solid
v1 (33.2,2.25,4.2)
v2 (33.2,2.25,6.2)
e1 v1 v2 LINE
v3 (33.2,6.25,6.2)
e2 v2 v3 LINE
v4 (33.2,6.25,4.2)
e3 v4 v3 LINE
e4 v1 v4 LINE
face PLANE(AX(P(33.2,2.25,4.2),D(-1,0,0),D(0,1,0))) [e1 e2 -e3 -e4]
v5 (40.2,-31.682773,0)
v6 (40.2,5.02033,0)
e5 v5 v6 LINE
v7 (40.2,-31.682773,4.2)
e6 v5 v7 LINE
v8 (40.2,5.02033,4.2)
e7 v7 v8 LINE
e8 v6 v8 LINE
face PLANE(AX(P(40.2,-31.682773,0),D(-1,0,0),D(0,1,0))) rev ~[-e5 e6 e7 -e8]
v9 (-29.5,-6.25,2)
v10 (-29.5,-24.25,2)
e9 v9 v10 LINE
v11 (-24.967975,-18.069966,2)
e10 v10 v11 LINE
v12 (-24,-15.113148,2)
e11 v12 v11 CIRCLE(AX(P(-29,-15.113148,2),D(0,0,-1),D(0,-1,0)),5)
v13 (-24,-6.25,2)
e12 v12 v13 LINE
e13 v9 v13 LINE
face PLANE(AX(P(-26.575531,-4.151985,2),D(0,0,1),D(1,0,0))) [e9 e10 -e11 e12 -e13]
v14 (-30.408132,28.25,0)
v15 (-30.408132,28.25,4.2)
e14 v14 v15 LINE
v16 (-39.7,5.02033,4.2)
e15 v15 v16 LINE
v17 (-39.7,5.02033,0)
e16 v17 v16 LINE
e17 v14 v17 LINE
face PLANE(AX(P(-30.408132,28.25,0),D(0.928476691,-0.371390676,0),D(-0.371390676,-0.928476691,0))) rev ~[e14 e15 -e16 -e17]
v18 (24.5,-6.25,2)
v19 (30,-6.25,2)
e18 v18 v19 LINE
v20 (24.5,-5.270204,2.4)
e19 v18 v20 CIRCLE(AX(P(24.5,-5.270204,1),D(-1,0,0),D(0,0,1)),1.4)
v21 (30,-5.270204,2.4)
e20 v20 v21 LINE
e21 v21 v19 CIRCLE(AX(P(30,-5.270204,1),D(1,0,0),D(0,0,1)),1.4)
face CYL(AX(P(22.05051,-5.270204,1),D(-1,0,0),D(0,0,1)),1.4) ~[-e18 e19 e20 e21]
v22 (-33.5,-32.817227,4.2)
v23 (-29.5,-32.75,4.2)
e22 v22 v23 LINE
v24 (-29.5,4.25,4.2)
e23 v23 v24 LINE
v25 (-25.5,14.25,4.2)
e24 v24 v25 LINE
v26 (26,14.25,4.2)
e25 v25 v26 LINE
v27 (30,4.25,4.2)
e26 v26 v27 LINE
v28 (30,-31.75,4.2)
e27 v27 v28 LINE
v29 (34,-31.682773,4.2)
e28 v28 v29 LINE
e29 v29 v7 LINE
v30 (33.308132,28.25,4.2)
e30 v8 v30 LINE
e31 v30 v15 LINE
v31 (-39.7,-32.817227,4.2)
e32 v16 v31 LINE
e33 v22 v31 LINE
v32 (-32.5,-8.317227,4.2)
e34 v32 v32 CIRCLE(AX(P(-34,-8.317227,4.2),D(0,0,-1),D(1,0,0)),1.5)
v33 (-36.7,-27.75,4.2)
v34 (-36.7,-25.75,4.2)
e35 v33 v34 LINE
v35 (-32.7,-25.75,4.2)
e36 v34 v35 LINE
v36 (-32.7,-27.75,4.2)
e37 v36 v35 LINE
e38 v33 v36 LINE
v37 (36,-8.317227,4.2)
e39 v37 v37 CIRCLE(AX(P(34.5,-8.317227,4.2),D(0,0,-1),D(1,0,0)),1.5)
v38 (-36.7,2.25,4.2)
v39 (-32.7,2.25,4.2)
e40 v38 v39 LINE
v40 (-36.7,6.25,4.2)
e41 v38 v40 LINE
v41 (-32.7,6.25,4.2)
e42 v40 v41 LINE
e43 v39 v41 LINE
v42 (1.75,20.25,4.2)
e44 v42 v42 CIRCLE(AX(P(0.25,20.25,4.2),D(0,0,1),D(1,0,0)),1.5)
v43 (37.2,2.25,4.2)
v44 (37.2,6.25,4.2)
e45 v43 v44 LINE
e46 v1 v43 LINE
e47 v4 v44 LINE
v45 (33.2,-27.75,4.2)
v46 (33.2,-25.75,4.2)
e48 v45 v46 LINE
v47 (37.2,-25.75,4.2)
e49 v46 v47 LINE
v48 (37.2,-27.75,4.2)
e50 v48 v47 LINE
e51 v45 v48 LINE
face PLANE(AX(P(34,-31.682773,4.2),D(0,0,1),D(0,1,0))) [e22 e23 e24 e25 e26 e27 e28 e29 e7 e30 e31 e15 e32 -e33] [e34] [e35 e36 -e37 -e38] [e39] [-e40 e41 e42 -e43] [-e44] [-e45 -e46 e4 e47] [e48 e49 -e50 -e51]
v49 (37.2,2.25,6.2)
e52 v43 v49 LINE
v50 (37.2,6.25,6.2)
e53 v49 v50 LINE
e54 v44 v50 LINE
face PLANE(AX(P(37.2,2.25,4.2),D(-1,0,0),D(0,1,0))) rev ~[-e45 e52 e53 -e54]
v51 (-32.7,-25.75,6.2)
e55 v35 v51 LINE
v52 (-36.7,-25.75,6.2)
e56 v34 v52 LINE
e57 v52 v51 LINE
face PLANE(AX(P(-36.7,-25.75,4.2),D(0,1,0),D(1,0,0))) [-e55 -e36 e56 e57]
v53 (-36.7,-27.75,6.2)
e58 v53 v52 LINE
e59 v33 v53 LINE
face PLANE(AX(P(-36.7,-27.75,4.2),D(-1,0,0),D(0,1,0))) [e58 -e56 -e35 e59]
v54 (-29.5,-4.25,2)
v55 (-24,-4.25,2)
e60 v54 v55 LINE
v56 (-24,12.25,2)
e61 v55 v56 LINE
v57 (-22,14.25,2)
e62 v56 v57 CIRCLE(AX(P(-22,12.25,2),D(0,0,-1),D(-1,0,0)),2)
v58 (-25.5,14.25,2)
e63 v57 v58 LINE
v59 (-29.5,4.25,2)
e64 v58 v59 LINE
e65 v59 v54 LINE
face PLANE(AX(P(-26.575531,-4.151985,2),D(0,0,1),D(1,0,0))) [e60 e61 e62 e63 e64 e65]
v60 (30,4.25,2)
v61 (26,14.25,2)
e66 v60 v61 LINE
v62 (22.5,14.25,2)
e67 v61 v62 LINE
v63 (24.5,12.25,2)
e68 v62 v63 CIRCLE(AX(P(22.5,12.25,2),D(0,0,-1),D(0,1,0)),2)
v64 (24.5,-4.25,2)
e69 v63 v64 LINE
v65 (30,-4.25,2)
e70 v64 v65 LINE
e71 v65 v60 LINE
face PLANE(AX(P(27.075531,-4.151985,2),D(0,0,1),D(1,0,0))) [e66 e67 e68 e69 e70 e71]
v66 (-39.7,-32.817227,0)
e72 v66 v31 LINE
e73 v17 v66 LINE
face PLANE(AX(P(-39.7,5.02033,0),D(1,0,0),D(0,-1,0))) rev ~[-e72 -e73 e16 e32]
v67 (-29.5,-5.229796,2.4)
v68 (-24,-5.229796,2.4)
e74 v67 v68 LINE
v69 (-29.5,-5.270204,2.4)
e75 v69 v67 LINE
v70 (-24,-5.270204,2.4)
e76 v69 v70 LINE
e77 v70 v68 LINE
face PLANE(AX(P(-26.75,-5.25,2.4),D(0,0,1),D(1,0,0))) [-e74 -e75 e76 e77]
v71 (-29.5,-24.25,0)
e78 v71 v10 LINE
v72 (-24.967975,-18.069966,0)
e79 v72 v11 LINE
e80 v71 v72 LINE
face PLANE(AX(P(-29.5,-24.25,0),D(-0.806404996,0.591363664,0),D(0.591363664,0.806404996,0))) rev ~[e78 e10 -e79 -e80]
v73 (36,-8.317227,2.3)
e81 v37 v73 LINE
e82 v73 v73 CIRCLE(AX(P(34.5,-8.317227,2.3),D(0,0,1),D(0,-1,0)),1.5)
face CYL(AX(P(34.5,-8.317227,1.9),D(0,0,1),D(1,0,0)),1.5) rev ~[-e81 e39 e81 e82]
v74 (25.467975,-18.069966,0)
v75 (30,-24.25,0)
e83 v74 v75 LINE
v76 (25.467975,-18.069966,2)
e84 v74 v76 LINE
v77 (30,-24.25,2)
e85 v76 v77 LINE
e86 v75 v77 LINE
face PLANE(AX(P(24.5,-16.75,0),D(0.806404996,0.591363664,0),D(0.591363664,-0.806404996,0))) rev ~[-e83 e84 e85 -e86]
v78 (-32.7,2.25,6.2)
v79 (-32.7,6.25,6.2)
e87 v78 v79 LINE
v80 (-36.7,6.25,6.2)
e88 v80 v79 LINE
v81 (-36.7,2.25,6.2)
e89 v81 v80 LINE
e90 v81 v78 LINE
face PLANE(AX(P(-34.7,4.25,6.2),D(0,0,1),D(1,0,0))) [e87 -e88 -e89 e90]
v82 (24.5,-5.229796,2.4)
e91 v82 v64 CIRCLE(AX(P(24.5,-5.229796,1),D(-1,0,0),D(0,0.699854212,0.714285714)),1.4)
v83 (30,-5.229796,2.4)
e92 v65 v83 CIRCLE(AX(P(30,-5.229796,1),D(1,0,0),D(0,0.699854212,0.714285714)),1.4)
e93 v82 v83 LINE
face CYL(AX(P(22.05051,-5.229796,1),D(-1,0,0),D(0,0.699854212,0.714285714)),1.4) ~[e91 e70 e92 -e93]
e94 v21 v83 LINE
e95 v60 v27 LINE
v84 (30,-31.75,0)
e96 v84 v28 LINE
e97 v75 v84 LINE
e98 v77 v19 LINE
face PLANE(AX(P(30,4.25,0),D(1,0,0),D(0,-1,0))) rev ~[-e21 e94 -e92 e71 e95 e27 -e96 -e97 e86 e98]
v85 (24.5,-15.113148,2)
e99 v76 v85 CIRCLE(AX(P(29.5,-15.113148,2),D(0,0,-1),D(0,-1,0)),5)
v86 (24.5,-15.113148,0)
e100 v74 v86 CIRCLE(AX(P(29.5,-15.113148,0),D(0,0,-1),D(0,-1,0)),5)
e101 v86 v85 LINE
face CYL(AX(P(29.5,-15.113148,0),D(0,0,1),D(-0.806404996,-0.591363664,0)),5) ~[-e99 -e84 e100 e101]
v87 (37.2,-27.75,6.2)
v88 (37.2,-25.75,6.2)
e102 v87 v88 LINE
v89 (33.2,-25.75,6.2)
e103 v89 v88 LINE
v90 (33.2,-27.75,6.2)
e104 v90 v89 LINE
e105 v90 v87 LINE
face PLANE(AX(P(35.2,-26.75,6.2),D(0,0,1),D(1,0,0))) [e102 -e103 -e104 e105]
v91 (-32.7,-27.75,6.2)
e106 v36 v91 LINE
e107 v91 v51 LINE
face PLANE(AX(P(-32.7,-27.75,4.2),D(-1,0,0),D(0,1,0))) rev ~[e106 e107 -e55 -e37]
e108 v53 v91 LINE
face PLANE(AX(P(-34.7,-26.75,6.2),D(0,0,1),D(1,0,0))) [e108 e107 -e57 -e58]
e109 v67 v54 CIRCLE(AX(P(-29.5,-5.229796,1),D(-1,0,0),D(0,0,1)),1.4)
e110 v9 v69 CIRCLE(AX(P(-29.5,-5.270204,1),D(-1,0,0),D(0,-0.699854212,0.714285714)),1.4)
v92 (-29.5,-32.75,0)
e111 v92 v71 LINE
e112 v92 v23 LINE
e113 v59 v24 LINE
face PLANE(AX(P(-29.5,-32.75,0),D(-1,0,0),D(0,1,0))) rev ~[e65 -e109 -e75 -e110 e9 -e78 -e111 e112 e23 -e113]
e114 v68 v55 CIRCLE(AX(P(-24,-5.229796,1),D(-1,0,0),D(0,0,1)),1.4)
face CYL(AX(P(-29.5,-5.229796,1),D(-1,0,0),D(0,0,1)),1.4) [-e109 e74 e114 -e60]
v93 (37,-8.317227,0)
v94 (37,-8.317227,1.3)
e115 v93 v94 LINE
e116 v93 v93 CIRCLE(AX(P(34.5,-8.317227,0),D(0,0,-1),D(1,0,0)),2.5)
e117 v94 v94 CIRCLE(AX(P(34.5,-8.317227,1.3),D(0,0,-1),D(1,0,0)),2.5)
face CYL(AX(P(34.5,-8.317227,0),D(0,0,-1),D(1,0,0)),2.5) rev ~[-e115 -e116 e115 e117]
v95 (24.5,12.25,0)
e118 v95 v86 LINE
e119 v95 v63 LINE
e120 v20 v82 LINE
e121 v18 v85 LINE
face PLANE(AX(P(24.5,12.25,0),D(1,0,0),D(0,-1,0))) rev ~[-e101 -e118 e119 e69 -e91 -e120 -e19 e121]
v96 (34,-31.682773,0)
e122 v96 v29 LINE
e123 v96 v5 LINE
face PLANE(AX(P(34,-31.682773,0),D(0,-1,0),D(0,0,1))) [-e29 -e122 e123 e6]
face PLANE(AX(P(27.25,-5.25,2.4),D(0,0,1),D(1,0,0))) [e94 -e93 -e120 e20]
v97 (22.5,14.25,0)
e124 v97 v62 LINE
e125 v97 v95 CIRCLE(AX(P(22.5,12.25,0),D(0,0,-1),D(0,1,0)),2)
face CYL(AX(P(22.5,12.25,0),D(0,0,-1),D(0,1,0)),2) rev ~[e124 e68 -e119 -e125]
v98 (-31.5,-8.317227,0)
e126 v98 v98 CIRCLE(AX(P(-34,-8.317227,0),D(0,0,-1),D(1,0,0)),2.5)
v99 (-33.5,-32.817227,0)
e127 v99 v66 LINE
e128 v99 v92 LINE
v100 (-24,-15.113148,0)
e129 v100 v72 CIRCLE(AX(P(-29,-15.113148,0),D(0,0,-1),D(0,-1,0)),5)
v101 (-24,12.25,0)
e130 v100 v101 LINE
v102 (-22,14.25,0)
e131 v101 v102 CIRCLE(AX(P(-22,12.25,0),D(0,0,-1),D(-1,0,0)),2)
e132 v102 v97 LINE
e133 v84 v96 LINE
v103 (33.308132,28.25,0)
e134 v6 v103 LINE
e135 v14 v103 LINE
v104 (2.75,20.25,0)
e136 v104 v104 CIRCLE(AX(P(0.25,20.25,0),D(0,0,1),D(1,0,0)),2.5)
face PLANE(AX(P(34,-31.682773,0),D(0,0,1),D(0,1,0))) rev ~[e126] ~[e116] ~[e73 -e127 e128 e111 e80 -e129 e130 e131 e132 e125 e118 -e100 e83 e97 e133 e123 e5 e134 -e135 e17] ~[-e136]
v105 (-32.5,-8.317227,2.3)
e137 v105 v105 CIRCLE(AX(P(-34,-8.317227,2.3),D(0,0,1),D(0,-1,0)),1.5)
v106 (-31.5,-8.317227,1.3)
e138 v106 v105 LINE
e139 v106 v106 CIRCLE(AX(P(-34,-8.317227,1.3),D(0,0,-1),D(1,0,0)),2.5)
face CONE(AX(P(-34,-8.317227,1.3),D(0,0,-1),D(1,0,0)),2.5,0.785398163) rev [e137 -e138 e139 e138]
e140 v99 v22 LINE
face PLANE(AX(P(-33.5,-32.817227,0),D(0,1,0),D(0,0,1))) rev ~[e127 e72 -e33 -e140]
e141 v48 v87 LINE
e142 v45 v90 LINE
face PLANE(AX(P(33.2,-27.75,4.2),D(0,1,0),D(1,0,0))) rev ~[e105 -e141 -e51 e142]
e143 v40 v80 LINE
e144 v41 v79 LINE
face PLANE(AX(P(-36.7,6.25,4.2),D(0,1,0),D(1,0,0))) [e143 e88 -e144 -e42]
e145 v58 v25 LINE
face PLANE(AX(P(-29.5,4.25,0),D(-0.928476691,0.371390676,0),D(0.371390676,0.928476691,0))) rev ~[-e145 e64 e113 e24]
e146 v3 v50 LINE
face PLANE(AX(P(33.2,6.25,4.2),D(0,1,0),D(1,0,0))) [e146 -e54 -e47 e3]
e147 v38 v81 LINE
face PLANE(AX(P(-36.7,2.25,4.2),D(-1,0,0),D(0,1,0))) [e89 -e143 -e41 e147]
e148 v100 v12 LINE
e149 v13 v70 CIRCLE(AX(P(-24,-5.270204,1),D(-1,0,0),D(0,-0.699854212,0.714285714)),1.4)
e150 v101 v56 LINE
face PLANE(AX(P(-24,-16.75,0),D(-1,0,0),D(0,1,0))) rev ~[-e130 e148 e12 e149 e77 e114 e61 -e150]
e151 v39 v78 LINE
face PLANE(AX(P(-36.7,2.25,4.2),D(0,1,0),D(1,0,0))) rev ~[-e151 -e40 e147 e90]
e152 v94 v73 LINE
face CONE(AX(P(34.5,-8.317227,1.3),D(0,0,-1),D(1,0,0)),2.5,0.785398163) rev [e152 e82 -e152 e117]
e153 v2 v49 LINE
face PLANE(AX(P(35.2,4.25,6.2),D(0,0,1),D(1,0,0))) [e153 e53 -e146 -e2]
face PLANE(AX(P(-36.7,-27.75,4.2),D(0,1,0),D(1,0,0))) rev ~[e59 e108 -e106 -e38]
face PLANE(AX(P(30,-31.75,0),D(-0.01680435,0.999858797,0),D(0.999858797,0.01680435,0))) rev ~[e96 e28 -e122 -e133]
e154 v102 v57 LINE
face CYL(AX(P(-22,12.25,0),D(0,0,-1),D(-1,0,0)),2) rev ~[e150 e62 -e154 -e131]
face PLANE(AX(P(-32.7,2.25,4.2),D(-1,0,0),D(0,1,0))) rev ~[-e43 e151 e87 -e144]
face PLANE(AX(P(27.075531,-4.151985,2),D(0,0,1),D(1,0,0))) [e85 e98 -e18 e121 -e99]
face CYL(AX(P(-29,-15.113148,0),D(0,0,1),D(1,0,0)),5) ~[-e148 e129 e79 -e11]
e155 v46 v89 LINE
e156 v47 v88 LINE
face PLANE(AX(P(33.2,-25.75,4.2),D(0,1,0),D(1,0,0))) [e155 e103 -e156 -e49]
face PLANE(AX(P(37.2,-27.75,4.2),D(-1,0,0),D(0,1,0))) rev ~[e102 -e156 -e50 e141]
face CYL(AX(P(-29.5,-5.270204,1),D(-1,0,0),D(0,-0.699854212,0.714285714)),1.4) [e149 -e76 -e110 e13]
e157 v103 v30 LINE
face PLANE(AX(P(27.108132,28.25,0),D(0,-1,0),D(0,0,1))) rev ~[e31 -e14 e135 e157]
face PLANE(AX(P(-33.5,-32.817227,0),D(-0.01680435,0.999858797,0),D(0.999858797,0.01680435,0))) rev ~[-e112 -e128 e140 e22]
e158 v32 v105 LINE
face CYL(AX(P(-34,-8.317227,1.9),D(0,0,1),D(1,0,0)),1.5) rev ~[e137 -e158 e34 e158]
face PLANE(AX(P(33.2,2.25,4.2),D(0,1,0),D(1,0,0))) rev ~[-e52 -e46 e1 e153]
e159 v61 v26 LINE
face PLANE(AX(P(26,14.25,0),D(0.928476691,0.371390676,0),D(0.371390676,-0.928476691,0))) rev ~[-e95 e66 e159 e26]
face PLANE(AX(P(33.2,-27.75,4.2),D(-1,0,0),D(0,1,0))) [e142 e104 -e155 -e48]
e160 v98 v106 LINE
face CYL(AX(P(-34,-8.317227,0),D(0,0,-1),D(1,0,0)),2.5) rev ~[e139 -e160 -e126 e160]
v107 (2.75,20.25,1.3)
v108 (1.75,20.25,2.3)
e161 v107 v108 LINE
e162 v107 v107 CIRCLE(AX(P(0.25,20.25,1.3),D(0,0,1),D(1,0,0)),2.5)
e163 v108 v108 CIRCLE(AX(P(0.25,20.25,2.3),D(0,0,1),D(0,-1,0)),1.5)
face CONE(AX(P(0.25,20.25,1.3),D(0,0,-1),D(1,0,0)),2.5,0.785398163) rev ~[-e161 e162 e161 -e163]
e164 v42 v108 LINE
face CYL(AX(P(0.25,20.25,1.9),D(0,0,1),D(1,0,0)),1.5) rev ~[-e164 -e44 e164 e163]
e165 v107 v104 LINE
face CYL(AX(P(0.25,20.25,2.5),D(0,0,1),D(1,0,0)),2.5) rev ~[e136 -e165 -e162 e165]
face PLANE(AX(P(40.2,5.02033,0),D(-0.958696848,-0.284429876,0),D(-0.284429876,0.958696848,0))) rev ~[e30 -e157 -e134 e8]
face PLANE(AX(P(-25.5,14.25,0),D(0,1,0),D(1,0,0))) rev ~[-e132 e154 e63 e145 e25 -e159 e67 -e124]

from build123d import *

# Parameters (mm, degrees)
F1_DEPTH      = 2
F2_DEPTH      = 4.2
F3_DEPTH      = 6.2
F4_DEPTH      = 6.2
F5_W          = 4
F5_H          = 2
F5_H_2        = 4
F6_DEPTH      = 2
F7_R          = 2.5
F7_R_2        = 1.5
F8_DEPTH      = 2.5
F9_DEPTH      = 4.5
F10_R         = 5
F12_START     = -1.7
F11_R         = 2.5
F11_R_2       = 1.5
F12_DEPTH     = 5.1
F13_DEPTH     = 4.2
F14_W         = 5.5
F14_H         = 2
F15_DEPTH     = 0.4
F16_T1_DEPTH  = 7.9494897428
F16_T3_DEPTH  = 7.9494897428
F17_S5_R      = 1.5
F17_T6_DEPTH  = 5
F17_S11_R     = 1.5
F17_T12_DEPTH = 5
F17_S17_R     = 1.5
F17_T18_DEPTH = 5


# Not quite as in the source:
# - a fillet or chamfer that OpenCascade refuses, or shapes differently, is made with other operations: its cross-section is extruded or revolved along the edge and cut away or added


with BuildPart() as f1:
    # F0 (on Top) → F1 (new body)
    with BuildSketch(Plane.XY):
        with BuildLine():
            Line((26, 14.25), (22.5, 14.25))
            ThreePointArc((22.5, 14.25), (23.9142135624, 13.6642135624), (24.5, 12.25))
            Line((24.5, 12.25), (24.5, -16.75))
            Line((24.5, -16.75), (30, -24.25))
            Line((30, -24.25), (30, 4.25))
            Line((30, 4.25), (26, 14.25))
        make_face()
    extrude(amount=F1_DEPTH)



with BuildPart() as f1b:
    # F0 (on Top) → F1, piece 2 (new body)
    with BuildSketch(Plane.XY):
        with BuildLine():
            Line((-22, 14.25), (-25.5, 14.25))
            Line((-25.5, 14.25), (-29.5, 4.25))
            Line((-29.5, 4.25), (-29.5, -24.25))
            Line((-29.5, -24.25), (-24, -16.75))
            Line((-24, -16.75), (-24, 12.25))
            ThreePointArc((-24, 12.25), (-23.4142135624, 13.6642135624), (-22, 14.25))
        make_face()
    extrude(amount=F1_DEPTH)


with BuildPart() as f1_1:
    add(f1.part)

    add(f1b.part)  # F2 merges F1b
    # F0 (on Top) → F2 (join)
    with BuildSketch(Plane.XY):
        Polygon((-29.5, 4.25), (-25.5, 14.25), (-22, 14.25), (22.5, 14.25), (26, 14.25), (30, 4.25), (30, -24.25), (30, -31.75), (34, -31.6827731092), (34, 5.0203296143), (27.1081318457, 28.25), (-24.2081318457, 28.25), (-33.5, 5.0203296143), (-33.5, -32.8172268908), (-29.5, -32.75), (-29.5, -24.25), align=None)
    extrude(amount=F2_DEPTH)

    # F3 (add): faces of the model
    f3_faces = [f1_1.faces().sort_by_distance(p)[0] for p in [
        (-33.5, -13.8984486382, 2.1),
        (-28.8540659229, 16.6351648071, 2.1),
    ]]
    extrude(f3_faces, amount=F3_DEPTH, dir=(-1, 0, 0))

    # F4 (add): faces of the model
    f4_faces = [f1_1.faces().sort_by_distance(p)[0] for p in [
        (34, -13.3312217475, 2.1),
        (30.5540659229, 16.6351648071, 2.1),
    ]]
    extrude(f4_faces, amount=F4_DEPTH, dir=(1, 0, 0))

    # F5 (on face) → F6 (join)
    with BuildSketch(Plane.XY.offset(4.2)):
        with Locations((-34.7, -26.75)):
            Rectangle(F5_W, F5_H)
        with Locations((35.2, -26.75)):
            Rectangle(F5_W, F5_H)
        with Locations((35.2, 4.25)):
            Rectangle(F5_W, F5_H_2)
        with Locations((-34.7, 4.25)):
            Rectangle(F5_W, F5_H_2)
    extrude(amount=F6_DEPTH)

    # F7 (on face) → F8 (cut)
    with BuildSketch(Plane(origin=(0, 0, 0), x_dir=(1, 0, 0), z_dir=(0, 0, -1))):
        with Locations((-34, 8.3172268908)):
            Circle(F7_R)
        with Locations((-34, 8.3172268908)):
            Circle(F7_R_2, mode=Mode.SUBTRACT)
        with Locations((34.5, 8.3172268908)):
            Circle(F7_R)
        with Locations((34.5, 8.3172268908)):
            Circle(F7_R_2, mode=Mode.SUBTRACT)
    extrude(amount=-F8_DEPTH, mode=Mode.SUBTRACT)

    # F9 (cut): faces of the model
    f9_faces = [f1_1.faces().sort_by_distance(p)[0] for p in [
        (-34, -8.3172268908, 0),
        (34.5, -8.3172268908, 0),
    ]]
    extrude(f9_faces, amount=-F9_DEPTH, mode=Mode.SUBTRACT)

    # F10
    f10_edges = [f1_1.edges().sort_by_distance(p)[0] for p in [
        (24.5, -16.75, 1),
        (-24, -16.75, 1),
    ]]
    fillet(f10_edges, radius=F10_R)

    # F11 (on face) → F12 (cut)
    with BuildSketch(Plane.XY.offset(4.2).offset(F12_START)):
        with Locations((0.25, 20.25)):
            Circle(F11_R)
        with Locations((0.25, 20.25)):
            Circle(F11_R_2, mode=Mode.SUBTRACT)
    extrude(amount=-F12_DEPTH, mode=Mode.SUBTRACT)

    # F11 (on face) → F13 (cut)
    with BuildSketch(Plane.XY.offset(4.2)):
        with Locations((0.25, 20.25)):
            Circle(F11_R_2)
    extrude(amount=-F13_DEPTH, mode=Mode.SUBTRACT)

    # F14 (on face) → F15 (join)
    with BuildSketch(Plane.XY.offset(2)):
        with Locations((27.25, -5.25)):
            Rectangle(F14_W, F14_H)
        with Locations((-26.75, -5.25)):
            Rectangle(F14_W, F14_H)
    extrude(amount=F15_DEPTH)

    # F16: fillet of radius 1.4 on 4 edges, made by hand

    # F16_s2 → F16_t1 (cut)
    with BuildSketch(Plane.YZ.offset(-29.5)):
        with BuildLine():
            ThreePointArc((-6.25, 2), (-5.7993543651, 2.2961481397), (-5.2702041029, 2.4))
            Line((-5.2702041029, 2.4), (-6.25, 2.4))
            Line((-6.25, 2.4), (-6.25, 2))
        make_face()
        with BuildLine():
            ThreePointArc((-5.2297958971, 2.4), (-4.7006456349, 2.2961481397), (-4.25, 2))
            Line((-4.25, 2), (-4.25, 2.4))
            Line((-4.25, 2.4), (-5.2297958971, 2.4))
        make_face()
    extrude(amount=F16_T1_DEPTH, mode=Mode.SUBTRACT)

    # F16_s4 → F16_t3 (cut)
    with BuildSketch(Plane.YZ.offset(22.0505102572)):
        with BuildLine():
            ThreePointArc((-4.25, 2), (-4.7006456349, 2.2961481397), (-5.2297958971, 2.4))
            Line((-5.2297958971, 2.4), (-4.25, 2.4))
            Line((-4.25, 2.4), (-4.25, 2))
        make_face()
        with BuildLine():
            ThreePointArc((-5.2702041029, 2.4), (-5.7993543651, 2.2961481397), (-6.25, 2))
            Line((-6.25, 2), (-6.25, 2.4))
            Line((-6.25, 2.4), (-5.2702041029, 2.4))
        make_face()
    extrude(amount=F16_T3_DEPTH, mode=Mode.SUBTRACT)

    # F17: chamfer of 1.2 on 3 edges, made by hand


with BuildPart() as f17_tool2:
    # F17_s3 → F17_t4 (revolve)
    with BuildSketch(Plane.XZ.offset(8.3172268908)):
        Polygon((-31.5, 1.3), (-32.7, 2.5), (-31.5, 2.5), align=None)
    revolve(axis=Axis((-34, -8.3172268908, 2.5), (0, 0, -1)))

    # F17_s5 → F17_t6 (cut, symmetric)
    with BuildSketch(Plane.XY.offset(1.9)):
        with Locations((-34, -8.3172268908)):
            Circle(F17_S5_R)
    extrude(amount=F17_T6_DEPTH, both=True, mode=Mode.SUBTRACT)


with BuildPart() as f1_2:
    add(f1_1.part)

    # F17_t1: union F17_tool2
    add(f17_tool2.part)


with BuildPart() as f17_tool8:
    # F17_s9 → F17_t10 (revolve)
    with BuildSketch(Plane.XZ.offset(8.3172268908)):
        Polygon((37, 1.3), (35.8, 2.5), (37, 2.5), align=None)
    revolve(axis=Axis((34.5, -8.3172268908, 2.5), (0, 0, -1)))

    # F17_s11 → F17_t12 (cut, symmetric)
    with BuildSketch(Plane.XY.offset(1.9)):
        with Locations((34.5, -8.3172268908)):
            Circle(F17_S11_R)
    extrude(amount=F17_T12_DEPTH, both=True, mode=Mode.SUBTRACT)


with BuildPart() as f1_3:
    add(f1_2.part)

    # F17_t7: union F17_tool8
    add(f17_tool8.part)


with BuildPart() as f17_tool14:
    # F17_s15 → F17_t16 (revolve)
    with BuildSketch(Plane.XZ.offset(-20.25)):
        Polygon((2.75, 1.3), (1.55, 2.5), (2.75, 2.5), align=None)
    revolve(axis=Axis((0.25, 20.25, 2.5), (0, 0, 1)))

    # F17_s17 → F17_t18 (cut, symmetric)
    with BuildSketch(Plane.XY.offset(1.9)):
        with Locations((0.25, 20.25)):
            Circle(F17_S17_R)
    extrude(amount=F17_T18_DEPTH, both=True, mode=Mode.SUBTRACT)


with BuildPart() as f1_4:
    add(f1_3.part)

    # F17_t13: union F17_tool14
    add(f17_tool14.part)


solid = f1_4.part
